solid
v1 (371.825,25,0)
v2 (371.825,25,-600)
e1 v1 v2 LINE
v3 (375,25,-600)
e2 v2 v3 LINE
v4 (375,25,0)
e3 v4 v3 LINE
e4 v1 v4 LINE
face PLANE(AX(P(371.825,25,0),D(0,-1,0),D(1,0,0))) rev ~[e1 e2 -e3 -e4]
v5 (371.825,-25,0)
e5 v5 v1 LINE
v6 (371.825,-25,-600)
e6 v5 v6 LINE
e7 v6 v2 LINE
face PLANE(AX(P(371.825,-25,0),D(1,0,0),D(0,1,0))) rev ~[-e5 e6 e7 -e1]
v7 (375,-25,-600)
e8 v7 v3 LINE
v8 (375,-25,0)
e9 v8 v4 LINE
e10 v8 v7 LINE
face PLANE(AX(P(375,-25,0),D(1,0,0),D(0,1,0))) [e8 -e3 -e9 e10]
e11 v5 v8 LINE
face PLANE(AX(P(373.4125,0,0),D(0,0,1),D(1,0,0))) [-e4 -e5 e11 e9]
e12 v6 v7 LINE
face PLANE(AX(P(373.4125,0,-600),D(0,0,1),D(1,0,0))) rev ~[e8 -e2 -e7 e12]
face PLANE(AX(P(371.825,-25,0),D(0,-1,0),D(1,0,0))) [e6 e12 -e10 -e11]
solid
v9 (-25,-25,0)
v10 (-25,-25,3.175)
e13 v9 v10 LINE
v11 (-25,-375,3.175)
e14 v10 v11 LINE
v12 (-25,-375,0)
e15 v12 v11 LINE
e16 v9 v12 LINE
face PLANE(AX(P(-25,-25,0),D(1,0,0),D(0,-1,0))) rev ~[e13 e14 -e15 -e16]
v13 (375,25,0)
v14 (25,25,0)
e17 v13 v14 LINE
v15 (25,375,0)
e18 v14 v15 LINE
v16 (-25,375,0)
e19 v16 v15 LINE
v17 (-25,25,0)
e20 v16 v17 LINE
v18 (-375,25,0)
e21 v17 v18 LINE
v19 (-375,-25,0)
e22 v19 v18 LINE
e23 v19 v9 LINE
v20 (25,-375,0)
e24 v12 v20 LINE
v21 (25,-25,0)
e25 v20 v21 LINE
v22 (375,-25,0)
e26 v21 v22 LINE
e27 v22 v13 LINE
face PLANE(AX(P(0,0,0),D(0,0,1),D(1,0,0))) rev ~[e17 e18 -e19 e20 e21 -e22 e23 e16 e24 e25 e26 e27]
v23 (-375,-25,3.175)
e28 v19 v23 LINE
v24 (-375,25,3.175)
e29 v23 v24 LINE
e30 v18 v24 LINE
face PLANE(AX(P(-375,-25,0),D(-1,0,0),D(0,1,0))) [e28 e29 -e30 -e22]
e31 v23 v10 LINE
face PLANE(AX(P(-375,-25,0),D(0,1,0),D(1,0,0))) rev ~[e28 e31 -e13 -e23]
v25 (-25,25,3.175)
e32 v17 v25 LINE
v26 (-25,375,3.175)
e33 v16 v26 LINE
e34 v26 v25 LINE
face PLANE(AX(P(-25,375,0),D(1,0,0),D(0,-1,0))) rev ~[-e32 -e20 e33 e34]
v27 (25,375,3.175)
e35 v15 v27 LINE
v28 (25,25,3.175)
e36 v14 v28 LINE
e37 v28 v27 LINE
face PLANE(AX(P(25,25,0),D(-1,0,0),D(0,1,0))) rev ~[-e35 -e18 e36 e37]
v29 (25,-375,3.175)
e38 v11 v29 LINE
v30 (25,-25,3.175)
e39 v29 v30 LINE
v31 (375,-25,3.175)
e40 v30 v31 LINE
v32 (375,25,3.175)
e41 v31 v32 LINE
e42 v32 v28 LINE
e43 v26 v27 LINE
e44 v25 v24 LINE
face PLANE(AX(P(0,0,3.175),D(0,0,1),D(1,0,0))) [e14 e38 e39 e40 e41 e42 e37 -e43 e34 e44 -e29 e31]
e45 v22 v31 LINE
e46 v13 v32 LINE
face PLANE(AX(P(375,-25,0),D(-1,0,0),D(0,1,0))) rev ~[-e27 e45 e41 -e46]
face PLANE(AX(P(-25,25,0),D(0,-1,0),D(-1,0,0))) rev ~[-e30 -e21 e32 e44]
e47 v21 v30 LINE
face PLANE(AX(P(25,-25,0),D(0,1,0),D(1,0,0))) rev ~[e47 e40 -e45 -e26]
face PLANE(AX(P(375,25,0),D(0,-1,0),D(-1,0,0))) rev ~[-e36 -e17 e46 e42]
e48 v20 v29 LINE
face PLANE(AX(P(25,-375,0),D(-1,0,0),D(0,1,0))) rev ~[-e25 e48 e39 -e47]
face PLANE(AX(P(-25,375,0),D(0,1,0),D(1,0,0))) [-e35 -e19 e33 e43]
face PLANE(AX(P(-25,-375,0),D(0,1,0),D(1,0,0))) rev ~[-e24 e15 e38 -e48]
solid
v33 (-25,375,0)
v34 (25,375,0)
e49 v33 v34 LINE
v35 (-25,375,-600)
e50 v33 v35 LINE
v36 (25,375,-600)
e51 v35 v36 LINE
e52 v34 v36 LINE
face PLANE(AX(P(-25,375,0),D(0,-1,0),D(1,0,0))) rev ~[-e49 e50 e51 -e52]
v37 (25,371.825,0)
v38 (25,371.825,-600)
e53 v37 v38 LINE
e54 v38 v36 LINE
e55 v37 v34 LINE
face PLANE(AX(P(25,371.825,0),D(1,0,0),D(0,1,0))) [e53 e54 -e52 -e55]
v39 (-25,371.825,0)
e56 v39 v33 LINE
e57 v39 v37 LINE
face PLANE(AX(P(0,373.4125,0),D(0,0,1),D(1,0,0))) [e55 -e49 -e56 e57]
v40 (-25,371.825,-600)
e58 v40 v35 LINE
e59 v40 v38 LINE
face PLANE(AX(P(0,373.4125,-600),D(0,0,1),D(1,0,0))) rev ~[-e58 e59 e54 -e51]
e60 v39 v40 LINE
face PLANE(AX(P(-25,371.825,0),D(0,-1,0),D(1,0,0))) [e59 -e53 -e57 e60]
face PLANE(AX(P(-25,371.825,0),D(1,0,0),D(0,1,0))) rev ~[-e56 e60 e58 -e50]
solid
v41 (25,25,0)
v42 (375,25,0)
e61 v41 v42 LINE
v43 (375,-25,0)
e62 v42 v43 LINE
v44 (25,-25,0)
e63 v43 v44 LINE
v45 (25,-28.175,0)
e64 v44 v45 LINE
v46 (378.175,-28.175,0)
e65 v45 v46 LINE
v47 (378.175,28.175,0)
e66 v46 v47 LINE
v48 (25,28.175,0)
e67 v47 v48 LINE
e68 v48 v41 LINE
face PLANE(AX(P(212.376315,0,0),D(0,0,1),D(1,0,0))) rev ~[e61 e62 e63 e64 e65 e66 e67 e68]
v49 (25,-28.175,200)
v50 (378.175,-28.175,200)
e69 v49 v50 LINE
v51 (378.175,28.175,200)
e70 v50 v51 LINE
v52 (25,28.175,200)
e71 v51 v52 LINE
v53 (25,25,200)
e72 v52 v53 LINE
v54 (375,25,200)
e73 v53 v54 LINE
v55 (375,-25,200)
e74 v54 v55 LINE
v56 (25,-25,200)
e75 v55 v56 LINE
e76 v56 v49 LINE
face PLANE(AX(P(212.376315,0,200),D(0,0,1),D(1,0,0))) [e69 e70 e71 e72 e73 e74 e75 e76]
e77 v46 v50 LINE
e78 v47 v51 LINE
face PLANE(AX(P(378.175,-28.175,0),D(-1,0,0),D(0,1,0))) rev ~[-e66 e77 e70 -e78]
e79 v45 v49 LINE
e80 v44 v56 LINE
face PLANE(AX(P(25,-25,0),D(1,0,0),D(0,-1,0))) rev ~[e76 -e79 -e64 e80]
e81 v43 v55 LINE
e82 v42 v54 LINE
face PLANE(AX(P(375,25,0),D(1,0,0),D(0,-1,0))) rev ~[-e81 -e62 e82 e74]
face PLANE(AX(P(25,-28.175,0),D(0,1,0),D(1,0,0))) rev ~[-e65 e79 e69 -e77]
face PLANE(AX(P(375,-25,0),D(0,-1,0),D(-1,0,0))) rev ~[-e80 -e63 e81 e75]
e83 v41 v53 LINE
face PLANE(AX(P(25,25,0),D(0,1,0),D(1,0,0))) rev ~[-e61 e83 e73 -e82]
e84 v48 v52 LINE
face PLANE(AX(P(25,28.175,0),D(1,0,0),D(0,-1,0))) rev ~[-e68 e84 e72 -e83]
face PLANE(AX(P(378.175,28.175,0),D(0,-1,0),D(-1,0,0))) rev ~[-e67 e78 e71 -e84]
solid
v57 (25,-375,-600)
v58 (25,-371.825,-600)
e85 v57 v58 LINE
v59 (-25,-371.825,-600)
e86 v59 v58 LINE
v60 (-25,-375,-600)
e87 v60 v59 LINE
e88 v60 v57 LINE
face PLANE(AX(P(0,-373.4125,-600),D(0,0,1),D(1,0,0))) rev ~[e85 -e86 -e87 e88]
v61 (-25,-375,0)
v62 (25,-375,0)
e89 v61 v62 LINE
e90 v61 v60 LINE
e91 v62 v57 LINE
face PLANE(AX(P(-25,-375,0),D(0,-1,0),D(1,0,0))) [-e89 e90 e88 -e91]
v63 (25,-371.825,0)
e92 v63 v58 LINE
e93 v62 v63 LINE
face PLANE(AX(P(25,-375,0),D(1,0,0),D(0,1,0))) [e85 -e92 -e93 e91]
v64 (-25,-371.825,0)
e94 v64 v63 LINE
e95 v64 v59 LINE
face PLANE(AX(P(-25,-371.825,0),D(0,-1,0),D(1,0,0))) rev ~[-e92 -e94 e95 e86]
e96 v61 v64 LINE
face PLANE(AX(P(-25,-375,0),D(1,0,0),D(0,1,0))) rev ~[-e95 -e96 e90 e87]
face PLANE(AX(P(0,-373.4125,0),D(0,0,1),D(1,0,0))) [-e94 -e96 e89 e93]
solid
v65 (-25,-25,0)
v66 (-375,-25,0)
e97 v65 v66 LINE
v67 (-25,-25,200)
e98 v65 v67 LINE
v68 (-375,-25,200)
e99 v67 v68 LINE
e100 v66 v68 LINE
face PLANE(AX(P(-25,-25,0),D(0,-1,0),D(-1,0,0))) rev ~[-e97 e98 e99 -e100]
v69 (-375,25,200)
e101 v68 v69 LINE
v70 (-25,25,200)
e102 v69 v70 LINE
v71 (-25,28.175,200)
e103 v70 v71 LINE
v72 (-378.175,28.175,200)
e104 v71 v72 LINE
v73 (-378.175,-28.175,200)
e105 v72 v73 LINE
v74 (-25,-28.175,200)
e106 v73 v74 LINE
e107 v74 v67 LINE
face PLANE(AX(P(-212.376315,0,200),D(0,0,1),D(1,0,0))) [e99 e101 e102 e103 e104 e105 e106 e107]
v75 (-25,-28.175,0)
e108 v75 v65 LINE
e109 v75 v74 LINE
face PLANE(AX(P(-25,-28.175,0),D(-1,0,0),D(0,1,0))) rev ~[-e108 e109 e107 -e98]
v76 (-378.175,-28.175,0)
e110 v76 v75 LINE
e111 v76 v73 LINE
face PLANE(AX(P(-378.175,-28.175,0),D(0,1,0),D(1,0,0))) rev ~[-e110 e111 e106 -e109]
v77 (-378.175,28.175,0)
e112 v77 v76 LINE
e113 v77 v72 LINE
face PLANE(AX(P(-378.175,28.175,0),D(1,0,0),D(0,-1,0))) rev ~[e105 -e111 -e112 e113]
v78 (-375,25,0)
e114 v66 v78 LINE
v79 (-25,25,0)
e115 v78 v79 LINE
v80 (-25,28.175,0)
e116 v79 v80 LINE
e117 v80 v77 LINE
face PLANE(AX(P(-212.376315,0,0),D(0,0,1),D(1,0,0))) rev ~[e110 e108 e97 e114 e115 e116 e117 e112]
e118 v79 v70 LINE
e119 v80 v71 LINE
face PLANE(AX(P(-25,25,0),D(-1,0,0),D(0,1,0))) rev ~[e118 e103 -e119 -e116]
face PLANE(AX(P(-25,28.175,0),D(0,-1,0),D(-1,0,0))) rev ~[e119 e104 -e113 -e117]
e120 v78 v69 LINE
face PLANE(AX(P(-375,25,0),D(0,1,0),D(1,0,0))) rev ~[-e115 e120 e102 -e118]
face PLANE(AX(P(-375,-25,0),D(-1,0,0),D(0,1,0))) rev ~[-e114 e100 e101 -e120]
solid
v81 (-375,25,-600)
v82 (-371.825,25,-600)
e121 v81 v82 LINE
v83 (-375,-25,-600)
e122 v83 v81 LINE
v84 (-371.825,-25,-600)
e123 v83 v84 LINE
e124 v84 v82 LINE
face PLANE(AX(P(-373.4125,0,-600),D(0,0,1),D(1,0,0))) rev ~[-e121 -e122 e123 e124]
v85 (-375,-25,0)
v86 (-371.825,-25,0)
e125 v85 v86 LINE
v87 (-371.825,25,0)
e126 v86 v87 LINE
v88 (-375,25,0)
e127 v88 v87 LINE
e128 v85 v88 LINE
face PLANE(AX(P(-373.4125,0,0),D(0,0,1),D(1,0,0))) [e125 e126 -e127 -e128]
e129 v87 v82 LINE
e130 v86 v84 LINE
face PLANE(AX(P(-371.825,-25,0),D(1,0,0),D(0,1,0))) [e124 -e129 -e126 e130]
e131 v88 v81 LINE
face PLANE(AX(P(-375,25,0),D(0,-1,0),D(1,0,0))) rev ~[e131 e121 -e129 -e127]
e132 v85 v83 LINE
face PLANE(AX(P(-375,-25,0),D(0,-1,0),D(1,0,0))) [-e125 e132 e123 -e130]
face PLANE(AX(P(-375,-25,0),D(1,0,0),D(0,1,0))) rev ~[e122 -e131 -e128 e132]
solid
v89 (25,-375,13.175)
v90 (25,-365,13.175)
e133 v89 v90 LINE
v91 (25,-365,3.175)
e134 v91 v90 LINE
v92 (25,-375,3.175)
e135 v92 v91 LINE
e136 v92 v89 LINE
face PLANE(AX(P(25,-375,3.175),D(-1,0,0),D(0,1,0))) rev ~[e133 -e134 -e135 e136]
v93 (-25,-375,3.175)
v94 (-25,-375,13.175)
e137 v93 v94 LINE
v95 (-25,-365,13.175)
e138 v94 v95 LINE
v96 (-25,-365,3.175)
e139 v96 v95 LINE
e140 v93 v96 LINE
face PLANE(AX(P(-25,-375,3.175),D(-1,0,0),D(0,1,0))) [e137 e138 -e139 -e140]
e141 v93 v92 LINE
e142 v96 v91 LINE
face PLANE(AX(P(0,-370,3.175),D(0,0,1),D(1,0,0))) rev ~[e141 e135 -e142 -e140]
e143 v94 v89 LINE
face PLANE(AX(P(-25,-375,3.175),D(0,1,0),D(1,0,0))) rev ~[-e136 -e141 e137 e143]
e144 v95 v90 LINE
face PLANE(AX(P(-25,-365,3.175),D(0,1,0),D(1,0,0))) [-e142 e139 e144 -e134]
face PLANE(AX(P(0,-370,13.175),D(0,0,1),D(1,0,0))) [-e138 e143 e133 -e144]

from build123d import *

# Parameters (mm, degrees)
F1_DEPTH = 200
F0_W     = 50
F0_H     = 50
F0_W_2   = 43.65
F0_H_2   = 43.65
F0_H_3   = 6.825
F0_W_3   = 346.825
F0_W_4   = 3.175
F0_H_4   = 3.175
F2_DEPTH = 3.175
F3_W     = 50
F3_H     = 10
F4_DEPTH = 10
F5_DEPTH = 600


# Not quite as in the source:
# - a length typed as a fraction of an inch, garbled in the dataset ("3 / 203.2 mm" for 3/8 in), is restored


with BuildPart() as f1:
    # F0 (on Top) → F1 (new body)
    with BuildSketch(Plane.XY):
        Polygon((-371.825, 25), (-25, 25), (-25, 28.175), (-378.175, 28.175), (-378.175, -28.175), (-25, -28.175), (-25, -25), (-371.825, -25), (-375, -25), (-375, 25), align=None)
    extrude(amount=F1_DEPTH)


with BuildPart() as f1b:
    # F0 (on Top) → F1, piece 2 (new body)
    with BuildSketch(Plane.XY):
        Polygon((371.825, 25), (375, 25), (375, -25), (371.825, -25), (25, -25), (25, -28.175), (378.175, -28.175), (378.175, 28.175), (25, 28.175), (25, 25), align=None)
    extrude(amount=F1_DEPTH)


with BuildPart() as f2:
    # F0 (on Top) → F2 (new body)
    with BuildSketch(Plane.XY):
        Rectangle(F0_W, F0_H)
        Rectangle(F0_W_2, F0_H_2, mode=Mode.SUBTRACT)
        Polygon((25, -28.175), (25, -25), (-25, -25), (-25, -28.175), (-25, -365), (25, -365), align=None)
        with Locations((0, -368.4125)):
            Rectangle(F0_W, F0_H_3)
        with Locations((-198.4125, 0)):
            Rectangle(F0_W_3, F0_H)
        Rectangle(F0_W_2, F0_H_2)
        with Locations((198.4125, 0)):
            Rectangle(F0_W_3, F0_H)
        Polygon((-25, 25), (25, 25), (25, 28.175), (25, 371.825), (-25, 371.825), (-25, 28.175), align=None)
        with Locations((-373.4125, 0)):
            Rectangle(F0_W_4, F0_H)
        with Locations((373.4125, 0)):
            Rectangle(F0_W_4, F0_H)
        with Locations((0, 373.4125)):
            Rectangle(F0_W, F0_H_4)
        with Locations((0, -373.4125)):
            Rectangle(F0_W, F0_H_4)
    extrude(amount=F2_DEPTH)


with BuildPart() as f4:
    # F3 (on face) → F4 (new body)
    with BuildSketch(Plane.XY.offset(3.175)):
        with Locations((0, -370)):
            Rectangle(F3_W, F3_H)
    extrude(amount=F4_DEPTH)


with BuildPart() as f5:
    # F0 (on Top) → F5 (new body)
    with BuildSketch(Plane.XY):
        with Locations((0, 373.4125)):
            Rectangle(F0_W, F0_H_4)
    extrude(amount=-F5_DEPTH)


with BuildPart() as f5b:
    # F0 (on Top) → F5, piece 2 (new body)
    with BuildSketch(Plane.XY):
        with Locations((-373.4125, 0)):
            Rectangle(F0_W_4, F0_H)
    extrude(amount=-F5_DEPTH)


with BuildPart() as f5c:
    # F0 (on Top) → F5, piece 3 (new body)
    with BuildSketch(Plane.XY):
        with Locations((373.4125, 0)):
            Rectangle(F0_W_4, F0_H)
    extrude(amount=-F5_DEPTH)


with BuildPart() as f5d:
    # F0 (on Top) → F5, piece 4 (new body)
    with BuildSketch(Plane.XY):
        with Locations((0, -373.4125)):
            Rectangle(F0_W, F0_H_4)
    extrude(amount=-F5_DEPTH)


solid = Compound([f1.part, f1b.part, f2.part, f4.part, f5.part, f5b.part, f5c.part, f5d.part])
